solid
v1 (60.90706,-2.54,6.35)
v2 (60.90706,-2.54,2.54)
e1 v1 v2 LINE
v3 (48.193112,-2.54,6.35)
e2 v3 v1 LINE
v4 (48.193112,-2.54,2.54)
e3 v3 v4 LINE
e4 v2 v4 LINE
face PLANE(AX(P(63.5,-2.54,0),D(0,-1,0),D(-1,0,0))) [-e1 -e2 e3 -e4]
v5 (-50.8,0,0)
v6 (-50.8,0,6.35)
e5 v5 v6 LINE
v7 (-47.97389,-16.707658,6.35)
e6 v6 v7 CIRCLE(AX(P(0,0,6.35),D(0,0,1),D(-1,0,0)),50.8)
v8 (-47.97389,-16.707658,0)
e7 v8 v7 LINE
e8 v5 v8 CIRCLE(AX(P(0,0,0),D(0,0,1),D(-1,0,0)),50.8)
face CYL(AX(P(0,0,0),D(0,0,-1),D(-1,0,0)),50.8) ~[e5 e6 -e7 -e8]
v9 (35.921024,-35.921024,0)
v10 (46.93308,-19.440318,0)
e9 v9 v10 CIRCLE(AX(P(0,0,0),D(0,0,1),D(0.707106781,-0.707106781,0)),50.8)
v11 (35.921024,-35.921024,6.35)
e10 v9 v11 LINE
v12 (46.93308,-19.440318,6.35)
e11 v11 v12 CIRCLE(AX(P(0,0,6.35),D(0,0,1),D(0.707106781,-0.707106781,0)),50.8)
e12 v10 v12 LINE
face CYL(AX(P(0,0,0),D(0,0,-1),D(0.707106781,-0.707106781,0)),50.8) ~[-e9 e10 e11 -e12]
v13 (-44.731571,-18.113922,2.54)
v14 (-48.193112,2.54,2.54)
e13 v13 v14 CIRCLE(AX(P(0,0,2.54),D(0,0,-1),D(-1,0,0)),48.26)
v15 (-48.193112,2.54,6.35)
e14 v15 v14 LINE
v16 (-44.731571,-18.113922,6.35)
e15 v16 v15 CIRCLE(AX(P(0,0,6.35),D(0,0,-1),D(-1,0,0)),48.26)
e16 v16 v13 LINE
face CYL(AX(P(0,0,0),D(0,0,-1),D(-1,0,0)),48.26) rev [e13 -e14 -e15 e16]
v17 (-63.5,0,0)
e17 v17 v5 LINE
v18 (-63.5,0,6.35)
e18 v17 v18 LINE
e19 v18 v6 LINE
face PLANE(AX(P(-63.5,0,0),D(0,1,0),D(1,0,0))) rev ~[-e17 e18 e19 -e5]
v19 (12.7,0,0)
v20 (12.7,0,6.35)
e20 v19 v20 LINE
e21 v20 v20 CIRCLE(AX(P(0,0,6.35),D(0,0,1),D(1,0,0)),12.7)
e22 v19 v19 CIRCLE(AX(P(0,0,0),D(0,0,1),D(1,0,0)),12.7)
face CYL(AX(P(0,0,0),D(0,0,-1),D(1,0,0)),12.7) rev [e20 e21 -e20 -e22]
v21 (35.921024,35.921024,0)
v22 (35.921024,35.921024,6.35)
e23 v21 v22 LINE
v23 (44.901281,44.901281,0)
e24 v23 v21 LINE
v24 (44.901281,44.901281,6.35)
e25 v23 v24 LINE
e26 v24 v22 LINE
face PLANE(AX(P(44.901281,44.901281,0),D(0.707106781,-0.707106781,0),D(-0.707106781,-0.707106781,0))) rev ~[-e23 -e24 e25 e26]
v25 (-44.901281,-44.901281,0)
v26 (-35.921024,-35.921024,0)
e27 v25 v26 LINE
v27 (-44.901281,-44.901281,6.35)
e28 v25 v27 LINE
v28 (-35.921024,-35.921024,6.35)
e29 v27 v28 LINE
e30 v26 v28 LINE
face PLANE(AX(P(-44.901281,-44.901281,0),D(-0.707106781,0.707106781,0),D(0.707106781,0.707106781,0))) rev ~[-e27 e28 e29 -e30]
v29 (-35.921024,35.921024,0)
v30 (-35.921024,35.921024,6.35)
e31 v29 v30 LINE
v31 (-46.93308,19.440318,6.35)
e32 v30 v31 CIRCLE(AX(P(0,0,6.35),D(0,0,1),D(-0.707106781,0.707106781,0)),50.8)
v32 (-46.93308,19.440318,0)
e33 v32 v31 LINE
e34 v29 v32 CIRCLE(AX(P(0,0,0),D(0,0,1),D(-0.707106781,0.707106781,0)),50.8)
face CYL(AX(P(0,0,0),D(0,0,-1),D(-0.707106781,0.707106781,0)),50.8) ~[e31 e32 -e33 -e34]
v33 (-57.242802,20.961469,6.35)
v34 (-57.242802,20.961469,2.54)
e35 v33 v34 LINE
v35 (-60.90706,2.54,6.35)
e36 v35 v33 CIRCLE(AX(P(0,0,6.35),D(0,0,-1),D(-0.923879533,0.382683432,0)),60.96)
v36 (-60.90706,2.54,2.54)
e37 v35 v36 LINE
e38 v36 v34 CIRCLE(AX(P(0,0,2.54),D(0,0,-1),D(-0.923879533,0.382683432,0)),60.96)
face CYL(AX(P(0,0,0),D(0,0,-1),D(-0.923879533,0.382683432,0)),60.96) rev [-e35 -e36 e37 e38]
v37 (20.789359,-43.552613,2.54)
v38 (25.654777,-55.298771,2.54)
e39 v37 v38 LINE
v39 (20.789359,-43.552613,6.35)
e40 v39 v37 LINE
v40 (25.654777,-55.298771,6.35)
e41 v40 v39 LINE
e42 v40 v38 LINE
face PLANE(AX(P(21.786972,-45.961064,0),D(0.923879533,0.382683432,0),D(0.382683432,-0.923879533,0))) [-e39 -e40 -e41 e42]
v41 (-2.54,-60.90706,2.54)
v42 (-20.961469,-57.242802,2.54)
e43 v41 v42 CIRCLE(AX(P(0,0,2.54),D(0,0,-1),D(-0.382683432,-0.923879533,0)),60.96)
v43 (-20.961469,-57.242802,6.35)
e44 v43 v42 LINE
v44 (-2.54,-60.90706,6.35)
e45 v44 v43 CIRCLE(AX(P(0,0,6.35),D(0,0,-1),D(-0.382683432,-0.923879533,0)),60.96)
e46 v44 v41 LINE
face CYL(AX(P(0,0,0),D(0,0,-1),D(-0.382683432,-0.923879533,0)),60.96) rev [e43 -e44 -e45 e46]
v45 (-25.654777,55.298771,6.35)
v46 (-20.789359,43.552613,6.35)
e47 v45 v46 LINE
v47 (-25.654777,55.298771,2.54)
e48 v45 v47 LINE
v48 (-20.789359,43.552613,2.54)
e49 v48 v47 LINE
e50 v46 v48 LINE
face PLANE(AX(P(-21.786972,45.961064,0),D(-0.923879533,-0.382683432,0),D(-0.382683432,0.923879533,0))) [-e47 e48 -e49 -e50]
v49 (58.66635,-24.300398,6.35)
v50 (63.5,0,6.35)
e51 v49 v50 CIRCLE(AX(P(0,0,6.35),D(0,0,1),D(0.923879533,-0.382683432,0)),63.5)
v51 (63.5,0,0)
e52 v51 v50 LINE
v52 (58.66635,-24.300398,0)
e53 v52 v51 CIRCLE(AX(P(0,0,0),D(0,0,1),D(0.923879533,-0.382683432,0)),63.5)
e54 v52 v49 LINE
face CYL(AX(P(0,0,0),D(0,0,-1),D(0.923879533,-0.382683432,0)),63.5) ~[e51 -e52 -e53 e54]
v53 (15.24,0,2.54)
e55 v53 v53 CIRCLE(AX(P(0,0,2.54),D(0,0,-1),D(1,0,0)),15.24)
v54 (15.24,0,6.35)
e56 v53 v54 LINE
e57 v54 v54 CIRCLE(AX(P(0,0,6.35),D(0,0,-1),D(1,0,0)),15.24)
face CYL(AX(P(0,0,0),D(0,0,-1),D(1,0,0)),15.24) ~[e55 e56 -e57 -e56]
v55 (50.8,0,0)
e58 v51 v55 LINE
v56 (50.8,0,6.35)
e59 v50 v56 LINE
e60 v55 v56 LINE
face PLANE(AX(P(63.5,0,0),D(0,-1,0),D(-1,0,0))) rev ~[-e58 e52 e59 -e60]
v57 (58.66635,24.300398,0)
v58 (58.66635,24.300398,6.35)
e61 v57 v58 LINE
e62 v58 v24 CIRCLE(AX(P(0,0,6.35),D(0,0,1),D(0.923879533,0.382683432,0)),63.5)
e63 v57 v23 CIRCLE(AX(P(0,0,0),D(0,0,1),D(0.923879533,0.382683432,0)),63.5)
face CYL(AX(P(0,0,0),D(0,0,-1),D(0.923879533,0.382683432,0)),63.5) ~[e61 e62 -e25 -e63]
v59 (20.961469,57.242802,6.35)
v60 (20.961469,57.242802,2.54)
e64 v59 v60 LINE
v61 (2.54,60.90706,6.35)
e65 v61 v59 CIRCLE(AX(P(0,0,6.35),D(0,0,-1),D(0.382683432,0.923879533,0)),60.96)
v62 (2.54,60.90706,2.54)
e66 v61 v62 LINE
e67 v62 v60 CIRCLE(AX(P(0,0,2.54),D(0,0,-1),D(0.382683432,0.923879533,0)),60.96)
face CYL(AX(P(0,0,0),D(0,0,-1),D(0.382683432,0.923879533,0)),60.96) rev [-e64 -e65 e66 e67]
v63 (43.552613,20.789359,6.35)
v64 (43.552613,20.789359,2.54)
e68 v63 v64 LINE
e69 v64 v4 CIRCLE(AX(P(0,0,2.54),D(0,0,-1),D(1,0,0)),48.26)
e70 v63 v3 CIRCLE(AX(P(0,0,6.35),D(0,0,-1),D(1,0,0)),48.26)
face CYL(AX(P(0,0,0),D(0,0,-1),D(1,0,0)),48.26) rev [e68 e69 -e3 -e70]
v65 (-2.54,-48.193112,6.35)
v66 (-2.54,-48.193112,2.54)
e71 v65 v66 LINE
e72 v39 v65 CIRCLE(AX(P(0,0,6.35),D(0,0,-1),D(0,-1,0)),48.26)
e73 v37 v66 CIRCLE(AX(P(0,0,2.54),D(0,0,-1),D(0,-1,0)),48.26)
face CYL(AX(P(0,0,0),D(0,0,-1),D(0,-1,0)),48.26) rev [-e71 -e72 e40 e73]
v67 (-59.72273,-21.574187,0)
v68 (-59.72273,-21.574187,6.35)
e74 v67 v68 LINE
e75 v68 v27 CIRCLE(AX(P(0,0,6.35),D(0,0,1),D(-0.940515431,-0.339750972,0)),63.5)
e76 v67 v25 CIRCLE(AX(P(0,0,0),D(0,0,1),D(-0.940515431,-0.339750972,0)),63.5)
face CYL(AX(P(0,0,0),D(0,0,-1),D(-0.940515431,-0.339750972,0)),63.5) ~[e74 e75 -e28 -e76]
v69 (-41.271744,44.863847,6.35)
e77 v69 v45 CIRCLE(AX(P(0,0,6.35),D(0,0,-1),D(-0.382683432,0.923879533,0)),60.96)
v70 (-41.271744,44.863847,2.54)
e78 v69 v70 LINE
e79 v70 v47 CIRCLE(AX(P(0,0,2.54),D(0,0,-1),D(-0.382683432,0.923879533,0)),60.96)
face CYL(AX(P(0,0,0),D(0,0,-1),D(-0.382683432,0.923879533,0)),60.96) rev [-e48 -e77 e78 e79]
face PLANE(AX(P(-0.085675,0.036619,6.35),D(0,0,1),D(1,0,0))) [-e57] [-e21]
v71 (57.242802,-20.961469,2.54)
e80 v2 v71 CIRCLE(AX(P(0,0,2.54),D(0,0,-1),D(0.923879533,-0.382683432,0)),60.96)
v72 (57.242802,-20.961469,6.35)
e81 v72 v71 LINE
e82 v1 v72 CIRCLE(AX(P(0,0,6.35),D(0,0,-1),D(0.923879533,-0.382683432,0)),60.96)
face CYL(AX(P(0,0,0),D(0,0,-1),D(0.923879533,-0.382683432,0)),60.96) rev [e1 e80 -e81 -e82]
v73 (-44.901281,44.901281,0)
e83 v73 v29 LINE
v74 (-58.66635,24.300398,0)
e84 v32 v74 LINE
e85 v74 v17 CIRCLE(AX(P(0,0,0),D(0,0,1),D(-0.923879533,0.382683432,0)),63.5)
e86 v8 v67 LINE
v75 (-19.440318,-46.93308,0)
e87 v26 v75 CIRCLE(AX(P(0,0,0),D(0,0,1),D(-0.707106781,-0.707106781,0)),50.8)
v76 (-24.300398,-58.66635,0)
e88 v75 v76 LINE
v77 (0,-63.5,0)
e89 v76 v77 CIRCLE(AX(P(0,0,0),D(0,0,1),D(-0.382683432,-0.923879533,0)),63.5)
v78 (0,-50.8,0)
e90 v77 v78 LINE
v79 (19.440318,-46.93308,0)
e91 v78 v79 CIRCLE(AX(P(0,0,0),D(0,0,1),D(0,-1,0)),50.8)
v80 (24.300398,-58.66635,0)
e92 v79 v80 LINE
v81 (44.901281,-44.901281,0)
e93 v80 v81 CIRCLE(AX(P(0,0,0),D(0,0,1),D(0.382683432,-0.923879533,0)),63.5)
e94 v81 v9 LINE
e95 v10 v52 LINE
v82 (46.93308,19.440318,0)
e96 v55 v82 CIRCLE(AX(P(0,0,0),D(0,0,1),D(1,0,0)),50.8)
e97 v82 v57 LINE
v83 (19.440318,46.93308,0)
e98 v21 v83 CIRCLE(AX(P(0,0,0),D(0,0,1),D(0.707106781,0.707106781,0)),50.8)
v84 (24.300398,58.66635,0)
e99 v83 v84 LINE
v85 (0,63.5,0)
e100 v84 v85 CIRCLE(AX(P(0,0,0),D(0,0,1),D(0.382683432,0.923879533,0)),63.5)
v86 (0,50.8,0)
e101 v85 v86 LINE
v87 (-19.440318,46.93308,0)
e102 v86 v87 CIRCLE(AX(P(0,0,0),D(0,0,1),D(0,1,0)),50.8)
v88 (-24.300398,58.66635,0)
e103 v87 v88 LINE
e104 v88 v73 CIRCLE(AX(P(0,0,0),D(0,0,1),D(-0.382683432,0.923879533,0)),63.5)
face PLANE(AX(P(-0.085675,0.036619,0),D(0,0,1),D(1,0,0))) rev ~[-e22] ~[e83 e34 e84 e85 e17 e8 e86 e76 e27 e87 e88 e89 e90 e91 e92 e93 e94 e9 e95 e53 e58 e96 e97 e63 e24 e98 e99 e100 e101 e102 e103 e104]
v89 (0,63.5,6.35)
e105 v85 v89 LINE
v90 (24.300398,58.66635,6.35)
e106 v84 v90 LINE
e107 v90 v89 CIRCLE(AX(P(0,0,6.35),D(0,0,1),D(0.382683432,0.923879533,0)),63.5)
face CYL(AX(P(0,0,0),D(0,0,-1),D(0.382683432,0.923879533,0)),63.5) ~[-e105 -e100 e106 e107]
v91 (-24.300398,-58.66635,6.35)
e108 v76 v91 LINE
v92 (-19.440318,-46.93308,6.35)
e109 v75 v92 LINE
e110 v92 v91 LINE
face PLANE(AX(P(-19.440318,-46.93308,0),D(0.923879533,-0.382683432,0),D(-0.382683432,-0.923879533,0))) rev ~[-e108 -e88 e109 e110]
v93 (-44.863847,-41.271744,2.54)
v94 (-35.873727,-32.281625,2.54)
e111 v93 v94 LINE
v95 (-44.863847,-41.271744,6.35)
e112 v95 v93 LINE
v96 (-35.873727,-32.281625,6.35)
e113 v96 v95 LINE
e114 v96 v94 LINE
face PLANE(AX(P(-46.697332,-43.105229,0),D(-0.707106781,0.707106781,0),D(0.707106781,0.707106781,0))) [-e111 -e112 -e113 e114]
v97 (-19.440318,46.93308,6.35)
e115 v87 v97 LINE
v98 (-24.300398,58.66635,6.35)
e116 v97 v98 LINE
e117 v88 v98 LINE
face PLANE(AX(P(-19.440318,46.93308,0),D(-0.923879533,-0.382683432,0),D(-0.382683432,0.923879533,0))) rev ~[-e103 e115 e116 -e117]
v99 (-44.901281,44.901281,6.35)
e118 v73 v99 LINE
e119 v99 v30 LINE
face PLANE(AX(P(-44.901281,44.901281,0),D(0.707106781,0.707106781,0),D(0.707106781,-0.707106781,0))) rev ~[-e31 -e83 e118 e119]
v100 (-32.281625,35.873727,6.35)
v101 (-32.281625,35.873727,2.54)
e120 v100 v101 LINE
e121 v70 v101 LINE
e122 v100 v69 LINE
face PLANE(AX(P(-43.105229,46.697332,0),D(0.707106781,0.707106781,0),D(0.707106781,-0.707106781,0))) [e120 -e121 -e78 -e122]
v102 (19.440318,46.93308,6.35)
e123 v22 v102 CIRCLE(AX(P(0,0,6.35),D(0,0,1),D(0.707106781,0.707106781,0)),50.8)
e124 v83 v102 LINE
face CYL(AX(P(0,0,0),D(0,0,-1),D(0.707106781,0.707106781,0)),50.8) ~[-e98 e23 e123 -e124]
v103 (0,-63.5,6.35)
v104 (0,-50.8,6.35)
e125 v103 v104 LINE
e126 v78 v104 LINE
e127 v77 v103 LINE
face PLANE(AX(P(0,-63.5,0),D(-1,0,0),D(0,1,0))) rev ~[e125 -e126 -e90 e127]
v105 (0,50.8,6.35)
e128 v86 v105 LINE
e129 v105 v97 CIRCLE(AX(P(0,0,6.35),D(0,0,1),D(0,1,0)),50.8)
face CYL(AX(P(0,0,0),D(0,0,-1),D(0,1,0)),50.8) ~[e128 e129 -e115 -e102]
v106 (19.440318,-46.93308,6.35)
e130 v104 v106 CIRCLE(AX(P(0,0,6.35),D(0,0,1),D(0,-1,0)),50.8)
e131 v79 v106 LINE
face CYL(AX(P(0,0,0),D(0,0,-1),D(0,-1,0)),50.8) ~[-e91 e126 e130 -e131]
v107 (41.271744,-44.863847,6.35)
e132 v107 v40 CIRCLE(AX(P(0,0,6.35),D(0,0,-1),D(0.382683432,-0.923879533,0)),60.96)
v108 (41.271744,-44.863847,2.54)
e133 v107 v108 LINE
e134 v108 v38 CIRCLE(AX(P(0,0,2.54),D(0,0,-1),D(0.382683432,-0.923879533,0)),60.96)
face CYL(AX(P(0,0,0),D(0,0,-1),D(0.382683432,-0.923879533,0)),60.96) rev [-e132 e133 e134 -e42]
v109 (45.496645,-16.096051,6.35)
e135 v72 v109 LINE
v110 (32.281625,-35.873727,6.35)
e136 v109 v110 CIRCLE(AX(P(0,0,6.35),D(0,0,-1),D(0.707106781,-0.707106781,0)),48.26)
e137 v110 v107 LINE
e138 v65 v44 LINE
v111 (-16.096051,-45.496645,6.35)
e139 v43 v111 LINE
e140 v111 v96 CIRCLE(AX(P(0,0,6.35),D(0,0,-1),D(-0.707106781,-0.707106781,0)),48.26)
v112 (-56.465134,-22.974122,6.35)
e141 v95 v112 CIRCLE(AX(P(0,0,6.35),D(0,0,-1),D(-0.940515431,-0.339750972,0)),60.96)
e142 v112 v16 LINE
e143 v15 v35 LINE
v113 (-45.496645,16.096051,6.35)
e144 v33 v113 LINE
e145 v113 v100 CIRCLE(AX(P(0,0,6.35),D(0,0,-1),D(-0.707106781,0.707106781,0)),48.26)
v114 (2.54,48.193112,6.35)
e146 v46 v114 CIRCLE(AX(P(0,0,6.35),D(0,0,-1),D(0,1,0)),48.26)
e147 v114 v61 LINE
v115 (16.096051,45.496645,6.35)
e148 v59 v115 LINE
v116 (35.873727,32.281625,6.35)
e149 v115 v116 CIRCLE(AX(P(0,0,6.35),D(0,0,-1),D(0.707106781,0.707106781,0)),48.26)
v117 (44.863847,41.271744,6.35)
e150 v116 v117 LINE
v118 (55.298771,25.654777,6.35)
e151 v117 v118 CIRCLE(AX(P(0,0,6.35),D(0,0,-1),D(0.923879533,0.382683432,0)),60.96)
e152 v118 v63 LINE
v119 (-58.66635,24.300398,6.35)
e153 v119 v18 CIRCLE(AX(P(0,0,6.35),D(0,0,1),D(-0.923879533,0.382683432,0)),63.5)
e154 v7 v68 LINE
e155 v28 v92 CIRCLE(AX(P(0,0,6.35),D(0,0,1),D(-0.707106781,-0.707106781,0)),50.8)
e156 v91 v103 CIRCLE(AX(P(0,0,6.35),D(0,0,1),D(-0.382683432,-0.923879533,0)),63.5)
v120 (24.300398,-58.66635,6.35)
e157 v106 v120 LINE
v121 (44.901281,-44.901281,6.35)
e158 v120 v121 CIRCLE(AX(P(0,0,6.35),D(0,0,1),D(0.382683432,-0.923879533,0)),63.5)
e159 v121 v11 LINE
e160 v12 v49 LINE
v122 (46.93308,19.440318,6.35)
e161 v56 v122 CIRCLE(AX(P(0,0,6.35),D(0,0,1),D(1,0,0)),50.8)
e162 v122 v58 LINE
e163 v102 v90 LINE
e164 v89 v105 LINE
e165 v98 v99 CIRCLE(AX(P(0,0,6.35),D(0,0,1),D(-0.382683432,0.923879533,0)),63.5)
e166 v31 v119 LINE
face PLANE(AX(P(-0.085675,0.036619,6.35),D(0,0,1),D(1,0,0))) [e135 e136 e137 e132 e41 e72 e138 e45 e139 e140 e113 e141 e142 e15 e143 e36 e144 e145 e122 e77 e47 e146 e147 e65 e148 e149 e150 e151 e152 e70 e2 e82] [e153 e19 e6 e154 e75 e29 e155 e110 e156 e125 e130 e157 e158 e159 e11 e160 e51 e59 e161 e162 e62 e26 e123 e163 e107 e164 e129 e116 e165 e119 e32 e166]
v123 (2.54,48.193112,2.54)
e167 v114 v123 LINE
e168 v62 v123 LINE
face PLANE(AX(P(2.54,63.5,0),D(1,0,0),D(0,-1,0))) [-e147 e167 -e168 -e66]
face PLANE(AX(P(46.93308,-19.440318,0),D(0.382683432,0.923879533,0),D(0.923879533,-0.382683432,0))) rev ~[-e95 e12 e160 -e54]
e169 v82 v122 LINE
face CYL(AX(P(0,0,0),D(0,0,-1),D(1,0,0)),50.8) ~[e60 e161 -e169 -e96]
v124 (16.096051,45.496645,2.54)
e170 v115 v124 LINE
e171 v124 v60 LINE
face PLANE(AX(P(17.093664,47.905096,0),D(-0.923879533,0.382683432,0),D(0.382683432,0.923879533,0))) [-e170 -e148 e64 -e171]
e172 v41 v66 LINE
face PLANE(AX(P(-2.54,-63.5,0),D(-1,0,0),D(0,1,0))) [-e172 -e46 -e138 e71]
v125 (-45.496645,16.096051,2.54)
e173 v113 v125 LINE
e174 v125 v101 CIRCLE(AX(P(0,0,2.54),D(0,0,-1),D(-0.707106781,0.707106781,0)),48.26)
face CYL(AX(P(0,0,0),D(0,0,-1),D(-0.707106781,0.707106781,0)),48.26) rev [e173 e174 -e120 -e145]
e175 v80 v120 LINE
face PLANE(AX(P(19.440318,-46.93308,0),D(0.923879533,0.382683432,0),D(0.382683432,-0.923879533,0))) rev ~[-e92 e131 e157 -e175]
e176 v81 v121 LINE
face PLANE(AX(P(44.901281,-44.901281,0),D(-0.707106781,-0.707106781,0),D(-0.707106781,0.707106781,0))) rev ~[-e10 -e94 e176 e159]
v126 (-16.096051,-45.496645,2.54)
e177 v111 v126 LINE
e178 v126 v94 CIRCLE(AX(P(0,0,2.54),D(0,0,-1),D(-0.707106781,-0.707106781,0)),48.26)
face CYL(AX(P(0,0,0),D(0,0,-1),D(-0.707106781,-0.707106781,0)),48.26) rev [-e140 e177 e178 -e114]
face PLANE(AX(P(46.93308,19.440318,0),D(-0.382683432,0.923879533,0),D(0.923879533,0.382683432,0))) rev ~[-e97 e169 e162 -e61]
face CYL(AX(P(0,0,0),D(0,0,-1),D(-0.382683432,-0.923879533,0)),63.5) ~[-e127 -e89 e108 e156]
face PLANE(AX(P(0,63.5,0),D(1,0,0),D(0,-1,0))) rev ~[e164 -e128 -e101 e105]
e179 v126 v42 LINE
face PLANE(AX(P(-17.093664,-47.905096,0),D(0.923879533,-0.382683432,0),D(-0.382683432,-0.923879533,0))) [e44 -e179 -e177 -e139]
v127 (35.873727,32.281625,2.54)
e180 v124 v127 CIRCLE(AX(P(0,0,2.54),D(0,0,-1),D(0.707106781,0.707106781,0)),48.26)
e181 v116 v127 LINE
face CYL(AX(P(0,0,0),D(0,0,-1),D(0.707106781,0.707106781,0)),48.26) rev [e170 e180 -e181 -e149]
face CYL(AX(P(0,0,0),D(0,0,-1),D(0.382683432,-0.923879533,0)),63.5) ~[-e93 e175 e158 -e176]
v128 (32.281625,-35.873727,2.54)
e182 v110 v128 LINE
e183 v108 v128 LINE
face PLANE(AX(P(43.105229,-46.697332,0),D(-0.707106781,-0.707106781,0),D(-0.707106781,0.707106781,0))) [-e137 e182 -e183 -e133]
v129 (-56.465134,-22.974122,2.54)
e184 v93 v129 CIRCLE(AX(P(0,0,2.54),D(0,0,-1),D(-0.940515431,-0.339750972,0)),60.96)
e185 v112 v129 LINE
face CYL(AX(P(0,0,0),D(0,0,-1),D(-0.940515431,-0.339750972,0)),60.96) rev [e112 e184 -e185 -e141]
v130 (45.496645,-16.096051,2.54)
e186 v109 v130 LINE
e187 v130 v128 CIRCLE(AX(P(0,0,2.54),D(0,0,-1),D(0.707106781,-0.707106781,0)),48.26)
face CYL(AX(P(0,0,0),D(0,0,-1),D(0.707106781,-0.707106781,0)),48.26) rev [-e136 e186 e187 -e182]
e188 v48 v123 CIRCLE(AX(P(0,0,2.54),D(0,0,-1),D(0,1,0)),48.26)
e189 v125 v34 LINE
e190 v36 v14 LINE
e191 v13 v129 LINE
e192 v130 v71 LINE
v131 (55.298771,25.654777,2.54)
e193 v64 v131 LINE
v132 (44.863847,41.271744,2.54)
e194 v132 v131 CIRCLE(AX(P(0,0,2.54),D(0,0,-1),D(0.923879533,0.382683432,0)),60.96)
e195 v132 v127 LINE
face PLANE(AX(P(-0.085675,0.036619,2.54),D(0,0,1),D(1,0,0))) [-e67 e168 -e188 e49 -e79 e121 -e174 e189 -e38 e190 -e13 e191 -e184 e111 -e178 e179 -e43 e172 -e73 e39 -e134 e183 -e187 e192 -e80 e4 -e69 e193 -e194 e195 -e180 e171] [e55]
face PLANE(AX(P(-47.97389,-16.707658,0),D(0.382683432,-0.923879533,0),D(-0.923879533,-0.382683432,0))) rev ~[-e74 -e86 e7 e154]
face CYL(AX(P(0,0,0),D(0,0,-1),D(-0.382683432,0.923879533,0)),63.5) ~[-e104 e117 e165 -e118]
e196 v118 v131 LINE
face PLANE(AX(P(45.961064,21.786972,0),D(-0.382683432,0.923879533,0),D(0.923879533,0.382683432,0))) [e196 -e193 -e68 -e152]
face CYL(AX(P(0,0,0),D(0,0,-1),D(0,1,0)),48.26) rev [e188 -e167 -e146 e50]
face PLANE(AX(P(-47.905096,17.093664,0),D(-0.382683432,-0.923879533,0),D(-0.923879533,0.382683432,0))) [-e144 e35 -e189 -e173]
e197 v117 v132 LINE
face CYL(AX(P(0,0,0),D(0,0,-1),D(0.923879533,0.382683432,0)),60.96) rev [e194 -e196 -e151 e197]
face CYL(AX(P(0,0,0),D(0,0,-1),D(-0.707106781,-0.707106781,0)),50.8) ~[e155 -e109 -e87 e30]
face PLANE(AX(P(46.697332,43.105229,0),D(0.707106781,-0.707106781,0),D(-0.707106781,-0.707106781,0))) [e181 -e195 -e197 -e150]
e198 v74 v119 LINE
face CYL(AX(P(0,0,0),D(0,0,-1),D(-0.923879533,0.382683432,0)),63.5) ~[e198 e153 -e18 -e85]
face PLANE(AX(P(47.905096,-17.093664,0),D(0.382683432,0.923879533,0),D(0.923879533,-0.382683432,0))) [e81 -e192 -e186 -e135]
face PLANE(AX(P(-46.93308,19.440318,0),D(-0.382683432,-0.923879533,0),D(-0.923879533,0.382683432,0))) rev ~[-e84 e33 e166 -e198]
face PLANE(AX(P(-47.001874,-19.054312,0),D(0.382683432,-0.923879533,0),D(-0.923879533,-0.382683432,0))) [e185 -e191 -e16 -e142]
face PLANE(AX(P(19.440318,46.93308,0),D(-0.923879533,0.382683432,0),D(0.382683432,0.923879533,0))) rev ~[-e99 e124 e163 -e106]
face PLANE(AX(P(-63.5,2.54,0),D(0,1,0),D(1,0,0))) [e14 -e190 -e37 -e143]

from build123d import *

# Parameters (mm, degrees)
F0_R     = 12.7
F1_DEPTH = 6.35
F2_T     = -2.54


with BuildPart() as f1:
    # F0 (on Top) → F1 (new body)
    with BuildSketch(Plane.XY):
        with BuildLine():
            Line((-46.9330802516, 19.4403183641), (-58.6663503145, 24.3003979552))
            ThreePointArc((-58.6663503145, 24.3003979552), (-62.2798653056, 12.388235448), (-63.5, 0))
            Line((-63.5, 0), (-50.8, 0))
            ThreePointArc((-50.8, 0), (-50.0884898607, -8.4724957052), (-47.9738904144, -16.7076580798))
            Line((-47.9738904144, -16.7076580798), (-59.7227298995, -21.5741867367))
            ThreePointArc((-59.7227298995, -21.5741867367), (-53.5964944807, -34.0538658507), (-44.9012806053, -44.9012806053))
            Line((-44.9012806053, -44.9012806053), (-35.9210244843, -35.9210244843))
            ThreePointArc((-35.9210244843, -35.9210244843), (-28.2229678374, -42.238656305), (-19.4403183641, -46.9330802516))
            Line((-19.4403183641, -46.9330802516), (-24.3003979552, -58.6663503145))
            ThreePointArc((-24.3003979552, -58.6663503145), (-12.388235448, -62.2798653056), (0, -63.5))
            Line((0, -63.5), (0, -50.8))
            ThreePointArc((0, -50.8), (9.9105883584, -49.8238922445), (19.4403183641, -46.9330802516))
            Line((19.4403183641, -46.9330802516), (24.3003979552, -58.6663503145))
            ThreePointArc((24.3003979552, -58.6663503145), (35.2787097967, -52.7983203812), (44.9012806053, -44.9012806053))
            Line((44.9012806053, -44.9012806053), (35.9210244843, -35.9210244843))
            ThreePointArc((35.9210244843, -35.9210244843), (42.238656305, -28.2229678374), (46.9330802516, -19.4403183641))
            Line((46.9330802516, -19.4403183641), (58.6663503145, -24.3003979552))
            ThreePointArc((58.6663503145, -24.3003979552), (62.2798653056, -12.388235448), (63.5, 0))
            Line((63.5, 0), (50.8, 0))
            ThreePointArc((50.8, 0), (49.8238922445, 9.9105883584), (46.9330802516, 19.4403183641))
            Line((46.9330802516, 19.4403183641), (58.6663503145, 24.3003979552))
            ThreePointArc((58.6663503145, 24.3003979552), (52.7983203812, 35.2787097967), (44.9012806053, 44.9012806053))
            Line((44.9012806053, 44.9012806053), (35.9210244843, 35.9210244843))
            ThreePointArc((35.9210244843, 35.9210244843), (28.2229678374, 42.238656305), (19.4403183641, 46.9330802516))
            Line((19.4403183641, 46.9330802516), (24.3003979552, 58.6663503145))
            ThreePointArc((24.3003979552, 58.6663503145), (12.388235448, 62.2798653056), (0, 63.5))
            Line((0, 63.5), (0, 50.8))
            ThreePointArc((0, 50.8), (-9.9105883584, 49.8238922445), (-19.4403183641, 46.9330802516))
            Line((-19.4403183641, 46.9330802516), (-24.3003979552, 58.6663503145))
            ThreePointArc((-24.3003979552, 58.6663503145), (-35.2787097967, 52.7983203812), (-44.9012806053, 44.9012806053))
            Line((-44.9012806053, 44.9012806053), (-35.9210244843, 35.9210244843))
            ThreePointArc((-35.9210244843, 35.9210244843), (-42.238656305, 28.2229678374), (-46.9330802516, 19.4403183641))
        make_face()
        Circle(F0_R, mode=Mode.SUBTRACT)
    extrude(amount=F1_DEPTH)

    # F2
    f2_openings = [f1.faces().sort_by_distance(p)[0] for p in [
        (-34.280877, 51.304958, 6.35),
    ]]
    offset(amount=F2_T, openings=f2_openings, kind=Kind.INTERSECTION)


solid = f1.part
